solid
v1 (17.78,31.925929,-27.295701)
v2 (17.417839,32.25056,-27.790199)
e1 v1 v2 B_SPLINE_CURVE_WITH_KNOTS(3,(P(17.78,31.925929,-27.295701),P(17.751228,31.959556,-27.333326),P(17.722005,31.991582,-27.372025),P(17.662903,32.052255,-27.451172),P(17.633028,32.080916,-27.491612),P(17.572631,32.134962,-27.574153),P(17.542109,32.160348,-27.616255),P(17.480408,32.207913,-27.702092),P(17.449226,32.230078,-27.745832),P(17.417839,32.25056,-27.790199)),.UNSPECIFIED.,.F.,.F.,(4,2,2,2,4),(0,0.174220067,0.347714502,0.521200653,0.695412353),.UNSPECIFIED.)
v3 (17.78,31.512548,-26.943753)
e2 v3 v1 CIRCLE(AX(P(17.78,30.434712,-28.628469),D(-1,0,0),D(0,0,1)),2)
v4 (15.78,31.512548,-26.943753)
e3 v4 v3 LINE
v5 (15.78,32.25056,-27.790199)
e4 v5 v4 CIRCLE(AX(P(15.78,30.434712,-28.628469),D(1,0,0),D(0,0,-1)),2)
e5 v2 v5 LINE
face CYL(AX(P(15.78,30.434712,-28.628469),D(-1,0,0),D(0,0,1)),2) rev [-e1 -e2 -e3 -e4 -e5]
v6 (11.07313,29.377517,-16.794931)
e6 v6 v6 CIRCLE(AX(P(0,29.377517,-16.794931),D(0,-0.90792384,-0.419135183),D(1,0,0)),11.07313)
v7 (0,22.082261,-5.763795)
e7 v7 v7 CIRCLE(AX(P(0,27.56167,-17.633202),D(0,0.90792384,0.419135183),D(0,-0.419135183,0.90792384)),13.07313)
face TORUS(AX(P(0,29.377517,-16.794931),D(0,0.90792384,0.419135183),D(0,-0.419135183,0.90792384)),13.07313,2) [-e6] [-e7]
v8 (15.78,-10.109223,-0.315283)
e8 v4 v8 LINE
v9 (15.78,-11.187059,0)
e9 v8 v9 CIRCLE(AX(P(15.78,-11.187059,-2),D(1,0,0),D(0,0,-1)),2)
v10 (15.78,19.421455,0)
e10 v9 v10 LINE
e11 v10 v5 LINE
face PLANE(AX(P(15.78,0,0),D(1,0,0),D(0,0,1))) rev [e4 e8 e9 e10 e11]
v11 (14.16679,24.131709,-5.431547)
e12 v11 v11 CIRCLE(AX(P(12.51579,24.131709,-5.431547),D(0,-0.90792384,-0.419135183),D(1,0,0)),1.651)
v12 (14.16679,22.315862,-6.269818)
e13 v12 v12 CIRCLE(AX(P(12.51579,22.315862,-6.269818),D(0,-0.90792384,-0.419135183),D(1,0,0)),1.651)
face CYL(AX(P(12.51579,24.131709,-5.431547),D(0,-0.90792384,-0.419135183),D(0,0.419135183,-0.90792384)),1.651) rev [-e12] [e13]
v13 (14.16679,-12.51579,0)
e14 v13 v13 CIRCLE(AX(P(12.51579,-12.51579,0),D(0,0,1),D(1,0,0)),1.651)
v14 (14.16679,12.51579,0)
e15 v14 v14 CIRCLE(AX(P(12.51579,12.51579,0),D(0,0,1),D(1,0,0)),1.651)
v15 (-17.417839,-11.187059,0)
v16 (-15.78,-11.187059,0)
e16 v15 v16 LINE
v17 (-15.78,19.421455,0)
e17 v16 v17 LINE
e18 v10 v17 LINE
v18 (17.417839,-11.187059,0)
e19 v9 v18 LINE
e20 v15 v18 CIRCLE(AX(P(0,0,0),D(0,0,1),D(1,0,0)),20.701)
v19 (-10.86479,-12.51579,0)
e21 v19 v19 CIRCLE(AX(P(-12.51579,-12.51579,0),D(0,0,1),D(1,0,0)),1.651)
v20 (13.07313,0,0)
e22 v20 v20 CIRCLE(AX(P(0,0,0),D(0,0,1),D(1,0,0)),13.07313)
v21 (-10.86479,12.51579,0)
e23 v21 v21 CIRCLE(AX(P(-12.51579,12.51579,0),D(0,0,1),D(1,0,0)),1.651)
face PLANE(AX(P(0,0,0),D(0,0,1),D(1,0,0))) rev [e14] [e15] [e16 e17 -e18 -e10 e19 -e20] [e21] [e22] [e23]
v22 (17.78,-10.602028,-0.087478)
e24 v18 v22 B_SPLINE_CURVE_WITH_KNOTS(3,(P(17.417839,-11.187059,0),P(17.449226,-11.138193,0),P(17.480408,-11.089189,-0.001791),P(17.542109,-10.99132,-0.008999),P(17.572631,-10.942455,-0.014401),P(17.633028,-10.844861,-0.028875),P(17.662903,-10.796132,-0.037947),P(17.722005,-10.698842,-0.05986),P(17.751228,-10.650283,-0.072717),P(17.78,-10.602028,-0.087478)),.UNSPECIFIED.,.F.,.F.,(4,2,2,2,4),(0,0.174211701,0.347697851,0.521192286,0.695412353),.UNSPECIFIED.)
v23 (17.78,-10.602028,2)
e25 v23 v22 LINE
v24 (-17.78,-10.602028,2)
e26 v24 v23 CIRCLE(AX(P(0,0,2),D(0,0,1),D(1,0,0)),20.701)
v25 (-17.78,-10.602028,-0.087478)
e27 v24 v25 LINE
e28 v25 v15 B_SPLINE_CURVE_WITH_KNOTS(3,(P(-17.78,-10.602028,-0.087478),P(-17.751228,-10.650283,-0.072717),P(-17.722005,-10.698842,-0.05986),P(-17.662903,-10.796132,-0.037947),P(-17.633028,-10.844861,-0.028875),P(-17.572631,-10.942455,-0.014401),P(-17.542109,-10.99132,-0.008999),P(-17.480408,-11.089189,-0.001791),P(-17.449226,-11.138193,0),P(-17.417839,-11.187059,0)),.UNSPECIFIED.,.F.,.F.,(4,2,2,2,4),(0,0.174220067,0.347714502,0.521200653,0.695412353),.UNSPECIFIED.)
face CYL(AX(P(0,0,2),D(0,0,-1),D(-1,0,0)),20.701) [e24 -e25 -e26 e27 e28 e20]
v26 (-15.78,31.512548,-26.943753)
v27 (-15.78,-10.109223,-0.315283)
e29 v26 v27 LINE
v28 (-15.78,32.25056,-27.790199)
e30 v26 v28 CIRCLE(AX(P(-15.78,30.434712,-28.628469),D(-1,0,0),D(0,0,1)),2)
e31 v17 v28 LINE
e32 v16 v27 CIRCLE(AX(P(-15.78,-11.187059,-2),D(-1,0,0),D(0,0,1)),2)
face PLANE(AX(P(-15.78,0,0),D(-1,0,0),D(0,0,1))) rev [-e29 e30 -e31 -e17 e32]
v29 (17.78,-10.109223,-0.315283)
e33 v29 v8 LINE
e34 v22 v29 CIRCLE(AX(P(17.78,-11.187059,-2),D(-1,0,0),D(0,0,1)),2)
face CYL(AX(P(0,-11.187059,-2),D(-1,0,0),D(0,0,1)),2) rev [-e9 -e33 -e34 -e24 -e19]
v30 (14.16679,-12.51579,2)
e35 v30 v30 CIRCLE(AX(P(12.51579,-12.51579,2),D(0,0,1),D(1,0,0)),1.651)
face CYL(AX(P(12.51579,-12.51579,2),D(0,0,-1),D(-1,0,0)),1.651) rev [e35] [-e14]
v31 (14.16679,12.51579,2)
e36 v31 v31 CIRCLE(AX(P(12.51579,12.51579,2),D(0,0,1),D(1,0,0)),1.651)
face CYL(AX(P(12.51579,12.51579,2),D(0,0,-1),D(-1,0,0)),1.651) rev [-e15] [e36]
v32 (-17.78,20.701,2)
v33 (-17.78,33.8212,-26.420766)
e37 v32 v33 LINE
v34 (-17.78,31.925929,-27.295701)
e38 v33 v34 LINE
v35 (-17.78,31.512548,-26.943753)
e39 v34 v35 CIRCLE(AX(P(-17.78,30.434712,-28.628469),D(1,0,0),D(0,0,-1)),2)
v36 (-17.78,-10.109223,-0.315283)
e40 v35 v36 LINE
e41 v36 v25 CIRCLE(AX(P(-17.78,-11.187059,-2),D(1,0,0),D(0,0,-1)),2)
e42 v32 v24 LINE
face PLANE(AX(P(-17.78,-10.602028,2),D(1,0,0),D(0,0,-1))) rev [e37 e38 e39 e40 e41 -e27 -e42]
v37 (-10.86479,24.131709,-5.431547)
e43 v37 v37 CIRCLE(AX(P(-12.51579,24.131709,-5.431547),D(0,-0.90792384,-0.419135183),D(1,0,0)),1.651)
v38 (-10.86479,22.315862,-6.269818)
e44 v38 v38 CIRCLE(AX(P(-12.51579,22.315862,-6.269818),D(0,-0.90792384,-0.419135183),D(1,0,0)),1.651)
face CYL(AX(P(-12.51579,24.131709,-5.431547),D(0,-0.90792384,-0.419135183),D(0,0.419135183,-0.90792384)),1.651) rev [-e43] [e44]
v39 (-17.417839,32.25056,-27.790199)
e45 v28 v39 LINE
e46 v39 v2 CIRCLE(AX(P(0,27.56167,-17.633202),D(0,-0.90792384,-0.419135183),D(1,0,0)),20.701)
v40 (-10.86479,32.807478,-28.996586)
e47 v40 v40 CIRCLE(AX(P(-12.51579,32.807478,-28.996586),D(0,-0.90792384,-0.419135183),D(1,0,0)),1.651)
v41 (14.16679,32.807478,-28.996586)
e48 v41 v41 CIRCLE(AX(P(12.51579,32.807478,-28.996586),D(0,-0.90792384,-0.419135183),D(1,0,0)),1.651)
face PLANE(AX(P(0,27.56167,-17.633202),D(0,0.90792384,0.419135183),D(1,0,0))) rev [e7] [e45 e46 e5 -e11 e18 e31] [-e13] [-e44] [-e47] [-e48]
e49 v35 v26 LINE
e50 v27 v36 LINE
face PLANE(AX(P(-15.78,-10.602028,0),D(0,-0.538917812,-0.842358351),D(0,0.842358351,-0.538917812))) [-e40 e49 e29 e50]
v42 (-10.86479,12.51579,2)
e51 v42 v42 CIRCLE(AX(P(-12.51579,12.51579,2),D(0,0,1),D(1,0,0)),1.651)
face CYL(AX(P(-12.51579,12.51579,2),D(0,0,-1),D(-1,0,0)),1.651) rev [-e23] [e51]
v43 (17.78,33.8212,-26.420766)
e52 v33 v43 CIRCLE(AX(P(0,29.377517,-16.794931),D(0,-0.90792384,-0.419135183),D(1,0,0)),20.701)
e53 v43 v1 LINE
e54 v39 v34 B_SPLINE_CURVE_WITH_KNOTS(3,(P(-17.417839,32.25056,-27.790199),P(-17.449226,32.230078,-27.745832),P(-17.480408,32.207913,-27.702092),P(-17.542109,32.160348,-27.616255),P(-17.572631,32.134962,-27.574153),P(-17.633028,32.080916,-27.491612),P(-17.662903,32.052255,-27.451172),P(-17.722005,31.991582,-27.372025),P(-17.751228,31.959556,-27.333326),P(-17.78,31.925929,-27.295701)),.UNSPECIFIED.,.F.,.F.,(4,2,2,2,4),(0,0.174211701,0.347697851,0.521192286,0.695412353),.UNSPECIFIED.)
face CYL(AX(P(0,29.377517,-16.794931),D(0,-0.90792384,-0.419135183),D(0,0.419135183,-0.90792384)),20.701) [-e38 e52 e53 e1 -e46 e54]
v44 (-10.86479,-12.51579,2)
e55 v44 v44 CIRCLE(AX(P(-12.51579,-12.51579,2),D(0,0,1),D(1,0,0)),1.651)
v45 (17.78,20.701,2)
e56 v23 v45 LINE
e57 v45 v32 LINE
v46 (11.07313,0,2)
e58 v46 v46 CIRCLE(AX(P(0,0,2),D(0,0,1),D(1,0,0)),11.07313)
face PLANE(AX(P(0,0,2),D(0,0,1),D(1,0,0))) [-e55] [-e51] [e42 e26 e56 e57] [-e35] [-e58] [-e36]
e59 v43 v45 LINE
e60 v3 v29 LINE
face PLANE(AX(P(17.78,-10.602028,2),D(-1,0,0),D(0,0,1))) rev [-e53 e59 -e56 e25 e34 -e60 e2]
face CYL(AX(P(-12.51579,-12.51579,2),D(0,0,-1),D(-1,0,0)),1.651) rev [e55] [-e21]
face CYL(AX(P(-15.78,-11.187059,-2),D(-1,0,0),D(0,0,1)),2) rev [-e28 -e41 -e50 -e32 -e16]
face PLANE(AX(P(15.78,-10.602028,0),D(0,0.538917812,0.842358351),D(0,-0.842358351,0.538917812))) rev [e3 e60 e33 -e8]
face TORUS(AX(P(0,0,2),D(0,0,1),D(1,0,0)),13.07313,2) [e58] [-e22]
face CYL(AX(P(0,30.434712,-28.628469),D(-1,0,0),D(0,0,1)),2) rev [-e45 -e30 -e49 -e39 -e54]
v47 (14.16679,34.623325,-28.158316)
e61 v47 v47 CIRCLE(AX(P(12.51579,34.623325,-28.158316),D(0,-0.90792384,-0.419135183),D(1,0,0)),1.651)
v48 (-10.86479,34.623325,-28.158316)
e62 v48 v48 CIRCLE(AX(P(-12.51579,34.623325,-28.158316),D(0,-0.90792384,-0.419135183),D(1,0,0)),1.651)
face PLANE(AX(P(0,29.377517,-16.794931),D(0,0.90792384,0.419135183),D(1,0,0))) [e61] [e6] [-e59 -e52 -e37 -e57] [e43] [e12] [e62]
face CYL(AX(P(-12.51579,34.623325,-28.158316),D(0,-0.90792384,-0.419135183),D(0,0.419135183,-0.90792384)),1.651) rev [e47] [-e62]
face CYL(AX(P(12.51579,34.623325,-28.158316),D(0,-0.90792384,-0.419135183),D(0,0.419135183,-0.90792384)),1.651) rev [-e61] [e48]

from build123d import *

# Parameters (mm, degrees)
SKETCH1_R           = 1.651
SKETCH1_R_2         = 11.07313
BOSS_EXTRUDE1_DEPTH = 2
BOSS_EXTRUDE2_DEPTH = 2
FILLET2_R           = 2
FILLET3_R           = 2


with BuildPart() as part:
    # Sketch1 → Boss-Extrude1 (new body)
    with BuildSketch(Plane.XY):
        with BuildLine():
            Line((-17.78, -10.602028155), (-17.78, 20.701))
            Line((-17.78, 20.701), (17.78, 20.701))
            Line((17.78, 20.701), (17.78, -10.602028155))
            ThreePointArc((17.78, -10.602028155), (0, -20.701), (-17.78, -10.602028155))
        make_face()
        with Locations((-12.515790027, -12.515790027)):
            Circle(SKETCH1_R, mode=Mode.SUBTRACT)
        with Locations((12.515790027, -12.515790027)):
            Circle(SKETCH1_R, mode=Mode.SUBTRACT)
        with Locations((12.515790027, 12.515790027)):
            Circle(SKETCH1_R, mode=Mode.SUBTRACT)
        with Locations((-12.515790027, 12.515790027)):
            Circle(SKETCH1_R, mode=Mode.SUBTRACT)
        Circle(SKETCH1_R_2, mode=Mode.SUBTRACT)
    boss_extrude1 = extrude(amount=BOSS_EXTRUDE1_DEPTH)

    # Mirror1: Boss-Extrude1 across plane
    add(boss_extrude1.mirror(Plane(origin=(0, 13.78083487, -8.816600885), x_dir=(0, 0.5389178124813573, 0.8423583509352233), z_dir=(0, -0.8423583509352232, 0.5389178124813573))))

    # Sketch2 → Boss-Extrude2 (add)
    with BuildSketch(Plane.ZY.offset(17.78)):
        Polygon((0, -10.602028155), (-27.25903588, 32.005352748), (0, 19.421454752), align=None)
    boss_extrude2 = extrude(amount=-BOSS_EXTRUDE2_DEPTH)

    # Mirror2: Boss-Extrude2 across plane
    add(boss_extrude2.mirror(Plane(origin=(0, 0, 0), x_dir=(0, 0, 1), z_dir=(1, 0, 0))))

    # Fillet2
    fillet2_edges = [part.edges().sort_by_distance(p)[0] for p in [
        (-11.07313, 0, 0),
        (-11.07313, 27.561669739, -17.63320177),
    ]]
    fillet(fillet2_edges, radius=FILLET2_R - 0.0001)  # a hair under: the kernel refuses the full size

    # Fillet3
    fillet3_edges = [part.edges().sort_by_distance(p)[0] for p in [
        (-16.78, -10.602028155, 0),
        (-16.78, 32.005352748, -27.25903588),
        (16.78, -10.602028155, 0),
        (16.78, 32.005352748, -27.25903588),
    ]]
    fillet(fillet3_edges, radius=FILLET3_R)


solid = part.part
